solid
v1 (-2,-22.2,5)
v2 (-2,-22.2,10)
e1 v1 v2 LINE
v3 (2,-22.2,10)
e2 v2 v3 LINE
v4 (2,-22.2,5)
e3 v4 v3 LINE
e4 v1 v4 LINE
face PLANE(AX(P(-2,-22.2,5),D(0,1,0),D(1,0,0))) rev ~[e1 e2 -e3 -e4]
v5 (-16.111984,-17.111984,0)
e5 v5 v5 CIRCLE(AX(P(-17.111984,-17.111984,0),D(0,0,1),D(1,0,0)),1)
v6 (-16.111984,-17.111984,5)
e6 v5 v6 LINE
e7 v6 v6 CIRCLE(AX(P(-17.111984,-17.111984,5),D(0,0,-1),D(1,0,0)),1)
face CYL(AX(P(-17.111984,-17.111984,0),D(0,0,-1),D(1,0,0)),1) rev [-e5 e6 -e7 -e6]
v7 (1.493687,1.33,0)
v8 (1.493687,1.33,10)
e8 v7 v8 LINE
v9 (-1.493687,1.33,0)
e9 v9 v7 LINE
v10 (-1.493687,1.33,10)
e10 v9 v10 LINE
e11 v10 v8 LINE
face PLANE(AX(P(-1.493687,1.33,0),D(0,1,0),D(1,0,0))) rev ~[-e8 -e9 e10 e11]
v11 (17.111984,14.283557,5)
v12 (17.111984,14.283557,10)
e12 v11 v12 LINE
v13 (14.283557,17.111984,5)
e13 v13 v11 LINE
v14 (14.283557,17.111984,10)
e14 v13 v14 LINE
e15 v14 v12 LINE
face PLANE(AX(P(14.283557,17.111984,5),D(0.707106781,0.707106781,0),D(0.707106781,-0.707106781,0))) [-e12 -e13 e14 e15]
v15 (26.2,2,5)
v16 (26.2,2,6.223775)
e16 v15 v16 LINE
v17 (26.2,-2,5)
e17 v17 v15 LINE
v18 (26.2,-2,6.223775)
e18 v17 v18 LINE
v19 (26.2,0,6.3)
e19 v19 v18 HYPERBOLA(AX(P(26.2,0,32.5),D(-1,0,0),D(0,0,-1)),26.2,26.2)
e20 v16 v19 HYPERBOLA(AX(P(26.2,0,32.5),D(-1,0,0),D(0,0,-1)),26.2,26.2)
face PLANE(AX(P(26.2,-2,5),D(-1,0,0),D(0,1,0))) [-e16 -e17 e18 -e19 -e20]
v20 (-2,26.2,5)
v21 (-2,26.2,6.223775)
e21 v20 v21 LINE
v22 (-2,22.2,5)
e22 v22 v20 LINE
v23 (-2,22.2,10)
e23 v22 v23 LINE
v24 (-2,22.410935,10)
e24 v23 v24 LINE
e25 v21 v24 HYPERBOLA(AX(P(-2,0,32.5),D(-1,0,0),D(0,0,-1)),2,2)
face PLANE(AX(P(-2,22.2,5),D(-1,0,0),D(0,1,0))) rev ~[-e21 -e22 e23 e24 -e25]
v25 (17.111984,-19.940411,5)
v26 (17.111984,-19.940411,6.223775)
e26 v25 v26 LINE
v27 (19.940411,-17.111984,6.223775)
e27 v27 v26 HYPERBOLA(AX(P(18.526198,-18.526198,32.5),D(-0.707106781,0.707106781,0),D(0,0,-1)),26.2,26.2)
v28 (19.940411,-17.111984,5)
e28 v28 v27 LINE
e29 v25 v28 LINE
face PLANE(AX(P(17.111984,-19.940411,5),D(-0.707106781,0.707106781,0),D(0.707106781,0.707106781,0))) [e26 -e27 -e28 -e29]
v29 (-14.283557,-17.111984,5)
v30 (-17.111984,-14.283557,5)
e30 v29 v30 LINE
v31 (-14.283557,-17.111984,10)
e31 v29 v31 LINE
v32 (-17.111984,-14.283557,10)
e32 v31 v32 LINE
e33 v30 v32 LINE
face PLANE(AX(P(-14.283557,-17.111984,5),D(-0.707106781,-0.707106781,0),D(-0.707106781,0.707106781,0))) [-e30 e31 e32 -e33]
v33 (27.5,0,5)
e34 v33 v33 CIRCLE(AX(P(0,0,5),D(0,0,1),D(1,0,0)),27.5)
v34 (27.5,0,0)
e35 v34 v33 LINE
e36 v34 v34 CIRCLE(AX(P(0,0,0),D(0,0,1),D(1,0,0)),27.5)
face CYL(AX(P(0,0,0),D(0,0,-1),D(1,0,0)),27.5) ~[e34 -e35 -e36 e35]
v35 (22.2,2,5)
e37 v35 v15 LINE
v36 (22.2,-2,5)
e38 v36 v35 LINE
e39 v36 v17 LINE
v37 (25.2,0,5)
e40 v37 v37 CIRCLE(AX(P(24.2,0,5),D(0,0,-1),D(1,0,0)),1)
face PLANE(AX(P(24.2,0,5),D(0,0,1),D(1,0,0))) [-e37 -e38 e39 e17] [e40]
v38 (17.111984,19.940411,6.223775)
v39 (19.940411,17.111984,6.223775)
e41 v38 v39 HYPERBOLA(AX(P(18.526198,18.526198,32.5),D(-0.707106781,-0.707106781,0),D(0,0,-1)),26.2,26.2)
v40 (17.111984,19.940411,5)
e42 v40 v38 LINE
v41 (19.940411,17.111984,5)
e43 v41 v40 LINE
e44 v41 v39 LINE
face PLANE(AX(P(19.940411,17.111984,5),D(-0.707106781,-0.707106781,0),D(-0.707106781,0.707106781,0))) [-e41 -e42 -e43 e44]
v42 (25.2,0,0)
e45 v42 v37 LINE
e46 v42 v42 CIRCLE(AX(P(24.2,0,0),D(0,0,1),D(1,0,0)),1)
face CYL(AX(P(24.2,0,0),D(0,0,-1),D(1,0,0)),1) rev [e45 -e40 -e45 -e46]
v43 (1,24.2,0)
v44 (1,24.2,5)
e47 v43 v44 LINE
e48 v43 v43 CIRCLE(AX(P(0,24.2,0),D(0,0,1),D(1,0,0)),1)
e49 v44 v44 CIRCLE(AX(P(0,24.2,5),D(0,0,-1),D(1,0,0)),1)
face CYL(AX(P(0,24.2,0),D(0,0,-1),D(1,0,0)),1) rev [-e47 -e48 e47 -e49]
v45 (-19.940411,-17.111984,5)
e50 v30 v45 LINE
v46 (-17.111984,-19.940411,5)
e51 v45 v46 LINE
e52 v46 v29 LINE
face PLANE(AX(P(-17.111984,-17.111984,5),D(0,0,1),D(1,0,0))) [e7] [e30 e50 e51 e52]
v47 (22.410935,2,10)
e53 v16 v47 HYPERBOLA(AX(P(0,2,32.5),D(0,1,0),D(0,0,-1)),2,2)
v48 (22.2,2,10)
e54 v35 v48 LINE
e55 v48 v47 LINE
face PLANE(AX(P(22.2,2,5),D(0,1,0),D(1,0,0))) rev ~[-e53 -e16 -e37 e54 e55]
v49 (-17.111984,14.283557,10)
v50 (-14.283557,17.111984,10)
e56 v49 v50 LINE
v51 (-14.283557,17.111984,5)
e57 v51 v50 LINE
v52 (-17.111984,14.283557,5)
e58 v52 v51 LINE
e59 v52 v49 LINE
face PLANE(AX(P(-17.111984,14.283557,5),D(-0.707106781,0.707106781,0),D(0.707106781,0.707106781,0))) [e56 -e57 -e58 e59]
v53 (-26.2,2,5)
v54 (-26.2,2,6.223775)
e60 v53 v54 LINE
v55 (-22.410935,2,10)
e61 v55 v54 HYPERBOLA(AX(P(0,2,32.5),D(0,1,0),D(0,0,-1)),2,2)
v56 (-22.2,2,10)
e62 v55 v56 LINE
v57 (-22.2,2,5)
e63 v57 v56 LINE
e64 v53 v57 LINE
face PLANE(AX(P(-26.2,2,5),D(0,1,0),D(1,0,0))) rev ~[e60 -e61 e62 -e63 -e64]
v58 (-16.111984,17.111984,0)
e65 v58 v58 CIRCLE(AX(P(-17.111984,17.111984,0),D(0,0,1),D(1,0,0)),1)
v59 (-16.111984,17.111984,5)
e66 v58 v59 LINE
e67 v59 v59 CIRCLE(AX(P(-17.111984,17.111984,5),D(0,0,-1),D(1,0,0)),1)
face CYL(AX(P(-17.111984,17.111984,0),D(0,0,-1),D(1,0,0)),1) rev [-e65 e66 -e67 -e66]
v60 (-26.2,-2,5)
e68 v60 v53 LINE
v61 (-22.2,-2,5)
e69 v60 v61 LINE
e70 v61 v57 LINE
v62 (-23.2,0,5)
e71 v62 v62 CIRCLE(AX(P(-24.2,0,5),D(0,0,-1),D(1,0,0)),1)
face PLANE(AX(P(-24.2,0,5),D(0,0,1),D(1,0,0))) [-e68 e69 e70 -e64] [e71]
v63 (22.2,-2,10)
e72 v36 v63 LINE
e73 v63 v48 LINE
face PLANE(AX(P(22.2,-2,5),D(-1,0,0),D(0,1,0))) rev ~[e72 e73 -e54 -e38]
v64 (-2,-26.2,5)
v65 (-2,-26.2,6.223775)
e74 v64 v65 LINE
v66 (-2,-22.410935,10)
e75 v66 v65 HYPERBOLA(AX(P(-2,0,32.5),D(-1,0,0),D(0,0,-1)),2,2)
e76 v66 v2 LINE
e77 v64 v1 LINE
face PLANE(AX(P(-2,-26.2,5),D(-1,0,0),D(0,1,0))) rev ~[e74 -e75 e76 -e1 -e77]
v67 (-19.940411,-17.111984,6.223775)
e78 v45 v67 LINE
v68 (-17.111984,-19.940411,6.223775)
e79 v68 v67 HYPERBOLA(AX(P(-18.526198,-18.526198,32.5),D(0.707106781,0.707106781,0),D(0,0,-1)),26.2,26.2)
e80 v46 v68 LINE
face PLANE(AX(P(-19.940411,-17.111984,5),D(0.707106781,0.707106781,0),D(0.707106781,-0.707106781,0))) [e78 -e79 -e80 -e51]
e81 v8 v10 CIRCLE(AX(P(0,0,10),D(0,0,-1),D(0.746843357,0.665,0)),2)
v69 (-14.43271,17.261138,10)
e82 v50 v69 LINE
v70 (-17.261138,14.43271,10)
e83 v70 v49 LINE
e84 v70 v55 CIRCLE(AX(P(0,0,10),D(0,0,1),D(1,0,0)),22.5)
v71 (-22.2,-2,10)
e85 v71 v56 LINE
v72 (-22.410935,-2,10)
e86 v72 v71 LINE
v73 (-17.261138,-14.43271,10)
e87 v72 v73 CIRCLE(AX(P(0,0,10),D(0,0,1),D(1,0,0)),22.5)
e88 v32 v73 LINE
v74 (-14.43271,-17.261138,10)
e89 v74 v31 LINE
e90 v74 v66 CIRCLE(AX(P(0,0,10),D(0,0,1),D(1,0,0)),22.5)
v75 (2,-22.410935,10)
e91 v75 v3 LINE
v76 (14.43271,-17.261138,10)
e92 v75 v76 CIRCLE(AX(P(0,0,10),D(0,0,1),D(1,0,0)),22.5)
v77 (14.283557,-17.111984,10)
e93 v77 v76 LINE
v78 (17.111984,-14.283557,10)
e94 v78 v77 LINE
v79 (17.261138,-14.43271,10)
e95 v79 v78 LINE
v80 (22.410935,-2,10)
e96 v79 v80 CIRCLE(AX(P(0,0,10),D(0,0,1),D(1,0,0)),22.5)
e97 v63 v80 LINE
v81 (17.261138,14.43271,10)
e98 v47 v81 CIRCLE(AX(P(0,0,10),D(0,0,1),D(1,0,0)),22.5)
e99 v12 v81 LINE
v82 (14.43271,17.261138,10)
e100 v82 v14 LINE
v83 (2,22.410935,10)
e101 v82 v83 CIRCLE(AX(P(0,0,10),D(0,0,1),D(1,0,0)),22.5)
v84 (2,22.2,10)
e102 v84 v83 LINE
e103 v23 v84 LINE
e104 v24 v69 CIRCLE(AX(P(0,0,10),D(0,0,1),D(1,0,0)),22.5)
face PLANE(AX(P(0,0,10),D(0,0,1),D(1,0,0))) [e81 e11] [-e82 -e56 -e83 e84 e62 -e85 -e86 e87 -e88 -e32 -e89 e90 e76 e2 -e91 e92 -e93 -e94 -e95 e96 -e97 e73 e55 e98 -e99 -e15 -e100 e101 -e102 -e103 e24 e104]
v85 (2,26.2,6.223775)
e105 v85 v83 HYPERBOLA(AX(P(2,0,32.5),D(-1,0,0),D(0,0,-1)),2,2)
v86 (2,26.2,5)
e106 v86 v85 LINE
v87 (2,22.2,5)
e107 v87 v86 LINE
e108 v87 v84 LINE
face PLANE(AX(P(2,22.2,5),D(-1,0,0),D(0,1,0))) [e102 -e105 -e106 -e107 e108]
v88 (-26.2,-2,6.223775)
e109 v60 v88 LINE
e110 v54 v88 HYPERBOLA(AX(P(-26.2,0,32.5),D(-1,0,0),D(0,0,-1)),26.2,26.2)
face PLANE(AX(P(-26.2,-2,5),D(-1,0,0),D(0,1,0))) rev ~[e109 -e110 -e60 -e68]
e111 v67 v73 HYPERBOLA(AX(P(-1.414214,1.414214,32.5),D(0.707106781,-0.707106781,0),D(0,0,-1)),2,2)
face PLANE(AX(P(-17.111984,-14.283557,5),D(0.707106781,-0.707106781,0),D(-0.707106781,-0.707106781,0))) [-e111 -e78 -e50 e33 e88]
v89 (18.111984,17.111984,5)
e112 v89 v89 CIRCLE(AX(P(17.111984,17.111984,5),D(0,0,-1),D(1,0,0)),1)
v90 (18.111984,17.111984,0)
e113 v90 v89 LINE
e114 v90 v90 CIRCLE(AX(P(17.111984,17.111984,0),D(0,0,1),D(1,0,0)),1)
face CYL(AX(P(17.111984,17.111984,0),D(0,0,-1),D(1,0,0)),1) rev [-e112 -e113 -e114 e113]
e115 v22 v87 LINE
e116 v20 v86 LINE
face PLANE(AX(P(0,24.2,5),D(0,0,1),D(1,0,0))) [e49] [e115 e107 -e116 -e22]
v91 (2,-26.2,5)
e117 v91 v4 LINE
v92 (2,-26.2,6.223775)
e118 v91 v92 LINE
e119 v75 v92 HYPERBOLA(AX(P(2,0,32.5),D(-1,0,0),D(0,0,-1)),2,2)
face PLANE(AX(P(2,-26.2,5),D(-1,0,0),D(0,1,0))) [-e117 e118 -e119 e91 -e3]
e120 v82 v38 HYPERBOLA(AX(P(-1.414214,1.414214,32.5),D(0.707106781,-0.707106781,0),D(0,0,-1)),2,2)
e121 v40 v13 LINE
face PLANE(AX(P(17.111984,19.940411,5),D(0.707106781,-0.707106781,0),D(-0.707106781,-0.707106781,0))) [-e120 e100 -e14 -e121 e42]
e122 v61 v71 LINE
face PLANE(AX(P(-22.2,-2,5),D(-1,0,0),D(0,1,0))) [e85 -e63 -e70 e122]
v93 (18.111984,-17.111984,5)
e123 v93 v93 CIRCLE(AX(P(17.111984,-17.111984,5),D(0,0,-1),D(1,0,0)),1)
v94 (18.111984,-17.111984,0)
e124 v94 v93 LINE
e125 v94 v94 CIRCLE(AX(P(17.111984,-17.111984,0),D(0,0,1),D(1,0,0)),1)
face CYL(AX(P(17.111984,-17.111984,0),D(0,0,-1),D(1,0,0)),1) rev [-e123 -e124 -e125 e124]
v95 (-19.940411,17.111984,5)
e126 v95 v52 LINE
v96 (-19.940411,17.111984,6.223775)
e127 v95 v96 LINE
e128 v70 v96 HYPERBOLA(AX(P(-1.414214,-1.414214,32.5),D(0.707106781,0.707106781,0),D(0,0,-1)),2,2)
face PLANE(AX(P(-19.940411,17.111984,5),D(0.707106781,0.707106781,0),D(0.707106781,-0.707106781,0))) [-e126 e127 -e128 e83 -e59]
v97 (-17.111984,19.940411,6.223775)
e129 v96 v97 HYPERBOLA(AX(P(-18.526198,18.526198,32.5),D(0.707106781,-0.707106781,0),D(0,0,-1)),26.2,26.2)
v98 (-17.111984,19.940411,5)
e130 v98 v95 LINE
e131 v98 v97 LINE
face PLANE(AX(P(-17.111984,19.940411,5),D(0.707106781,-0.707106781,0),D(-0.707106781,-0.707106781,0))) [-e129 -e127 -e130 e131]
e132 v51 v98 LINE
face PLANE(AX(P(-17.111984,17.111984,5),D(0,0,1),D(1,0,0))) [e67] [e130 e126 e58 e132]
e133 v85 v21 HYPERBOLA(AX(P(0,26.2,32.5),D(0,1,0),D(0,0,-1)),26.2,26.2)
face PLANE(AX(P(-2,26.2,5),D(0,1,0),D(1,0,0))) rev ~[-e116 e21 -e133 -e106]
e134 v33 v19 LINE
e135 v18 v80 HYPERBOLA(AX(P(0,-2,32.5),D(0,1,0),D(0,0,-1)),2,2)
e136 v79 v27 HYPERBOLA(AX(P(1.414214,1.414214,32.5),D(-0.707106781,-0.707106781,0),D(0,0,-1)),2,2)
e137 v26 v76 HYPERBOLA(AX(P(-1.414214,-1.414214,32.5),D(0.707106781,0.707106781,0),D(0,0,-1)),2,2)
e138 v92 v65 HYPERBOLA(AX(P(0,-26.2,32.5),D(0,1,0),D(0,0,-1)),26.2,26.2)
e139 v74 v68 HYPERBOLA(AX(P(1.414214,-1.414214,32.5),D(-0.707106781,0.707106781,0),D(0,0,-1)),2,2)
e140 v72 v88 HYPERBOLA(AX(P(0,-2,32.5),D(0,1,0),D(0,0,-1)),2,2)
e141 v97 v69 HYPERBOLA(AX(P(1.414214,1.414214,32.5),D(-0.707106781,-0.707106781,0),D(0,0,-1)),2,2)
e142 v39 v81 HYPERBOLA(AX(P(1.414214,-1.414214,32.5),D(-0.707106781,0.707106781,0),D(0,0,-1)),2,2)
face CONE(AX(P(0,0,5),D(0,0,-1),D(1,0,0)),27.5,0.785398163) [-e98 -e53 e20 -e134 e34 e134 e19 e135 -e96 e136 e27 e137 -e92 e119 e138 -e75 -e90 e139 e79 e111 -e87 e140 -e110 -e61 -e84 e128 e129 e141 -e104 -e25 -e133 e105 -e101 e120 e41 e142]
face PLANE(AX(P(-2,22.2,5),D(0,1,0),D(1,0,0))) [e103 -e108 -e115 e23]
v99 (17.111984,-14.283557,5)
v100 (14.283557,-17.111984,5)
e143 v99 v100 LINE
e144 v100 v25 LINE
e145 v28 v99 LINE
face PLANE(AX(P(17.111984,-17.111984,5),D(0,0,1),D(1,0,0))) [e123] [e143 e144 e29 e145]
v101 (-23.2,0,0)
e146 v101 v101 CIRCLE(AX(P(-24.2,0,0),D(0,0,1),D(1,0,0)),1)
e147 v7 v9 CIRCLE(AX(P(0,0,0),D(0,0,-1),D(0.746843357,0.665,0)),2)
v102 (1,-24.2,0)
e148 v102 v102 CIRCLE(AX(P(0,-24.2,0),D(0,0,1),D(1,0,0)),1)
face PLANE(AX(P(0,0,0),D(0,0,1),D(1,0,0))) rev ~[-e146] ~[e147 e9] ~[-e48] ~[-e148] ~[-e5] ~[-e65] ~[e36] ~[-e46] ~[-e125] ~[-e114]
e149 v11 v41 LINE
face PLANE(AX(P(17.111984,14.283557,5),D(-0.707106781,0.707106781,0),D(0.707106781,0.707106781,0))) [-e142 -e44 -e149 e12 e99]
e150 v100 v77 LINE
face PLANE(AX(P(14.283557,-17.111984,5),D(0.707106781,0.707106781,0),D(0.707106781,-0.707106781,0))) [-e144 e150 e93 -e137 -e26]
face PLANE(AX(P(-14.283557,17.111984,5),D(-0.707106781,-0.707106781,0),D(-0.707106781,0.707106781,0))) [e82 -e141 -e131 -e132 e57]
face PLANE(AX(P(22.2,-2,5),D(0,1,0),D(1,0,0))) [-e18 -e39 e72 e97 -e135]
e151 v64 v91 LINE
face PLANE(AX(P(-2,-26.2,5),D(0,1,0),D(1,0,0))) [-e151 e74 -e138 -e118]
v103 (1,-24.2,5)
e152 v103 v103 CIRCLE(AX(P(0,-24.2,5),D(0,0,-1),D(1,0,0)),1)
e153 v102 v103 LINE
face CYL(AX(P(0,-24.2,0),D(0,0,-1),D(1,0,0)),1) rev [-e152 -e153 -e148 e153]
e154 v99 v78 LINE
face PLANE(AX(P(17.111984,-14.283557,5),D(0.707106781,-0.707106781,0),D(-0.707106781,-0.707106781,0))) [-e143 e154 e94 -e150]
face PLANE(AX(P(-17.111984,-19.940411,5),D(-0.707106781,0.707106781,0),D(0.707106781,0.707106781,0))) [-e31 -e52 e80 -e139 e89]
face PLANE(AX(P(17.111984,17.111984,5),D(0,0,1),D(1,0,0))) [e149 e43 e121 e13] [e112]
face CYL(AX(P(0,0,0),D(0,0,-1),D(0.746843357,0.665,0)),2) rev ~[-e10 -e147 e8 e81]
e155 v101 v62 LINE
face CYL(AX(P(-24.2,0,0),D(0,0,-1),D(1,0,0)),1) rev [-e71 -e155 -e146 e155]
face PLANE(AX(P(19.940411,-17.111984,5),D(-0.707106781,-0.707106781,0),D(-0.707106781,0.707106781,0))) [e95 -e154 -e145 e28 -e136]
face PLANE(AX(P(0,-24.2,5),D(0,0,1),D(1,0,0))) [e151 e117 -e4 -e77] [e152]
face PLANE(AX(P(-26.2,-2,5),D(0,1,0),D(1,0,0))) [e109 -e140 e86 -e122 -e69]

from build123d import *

# Parameters (mm, degrees)
F0_R     = 27.5
F0_R_2   = 1
F0_R_3   = 21.1
F1_DEPTH = 10
F3_DEPTH = 10
F5_W     = 4
F5_H     = 4
F5_R     = 1
F6_DEPTH = 5


# Not quite as in the source:
# - a fillet or chamfer that OpenCascade refuses, or shapes differently, is made with other operations: its cross-section is extruded or revolved along the edge and cut away or added


with BuildPart() as f1:
    # F0 (on Top) → F1 (new body)
    with BuildSketch(Plane.XY):
        Circle(F0_R)
        with Locations((-17.1119841047, -17.1119841047)):
            Circle(F0_R_2, mode=Mode.SUBTRACT)
        with Locations((0, -24.2)):
            Circle(F0_R_2, mode=Mode.SUBTRACT)
        with Locations((17.1119841047, -17.1119841047)):
            Circle(F0_R_2, mode=Mode.SUBTRACT)
        with Locations((-24.2, 0)):
            Circle(F0_R_2, mode=Mode.SUBTRACT)
        with Locations((-17.1119841047, 17.1119841047)):
            Circle(F0_R_2, mode=Mode.SUBTRACT)
        Circle(F0_R_3, mode=Mode.SUBTRACT)
        with Locations((24.2, 0)):
            Circle(F0_R_2, mode=Mode.SUBTRACT)
        with Locations((0, 24.2)):
            Circle(F0_R_2, mode=Mode.SUBTRACT)
        with Locations((17.1119841047, 17.1119841047)):
            Circle(F0_R_2, mode=Mode.SUBTRACT)
        Circle(F0_R_3)
        with BuildLine():
            ThreePointArc((1.4936867141, 1.33), (0, -2), (-1.4936867141, 1.33))
            Line((-1.4936867141, 1.33), (1.4936867141, 1.33))
        make_face(mode=Mode.SUBTRACT)
    extrude(amount=F1_DEPTH)

    # F2: chamfer of 5 on 1 edges, made by hand

    # F2_s1 → F2_t2 (revolve, cut)
    with BuildSketch(Plane.XZ):
        Polygon((27.5, 5), (22.5, 10), (27.5, 10), align=None)
    revolve(axis=Axis((0, 0, 10), (0, 0, 1)), mode=Mode.SUBTRACT)

    # F0 (on Top) → F3 (cut)
    with BuildSketch(Plane.XY):
        with BuildLine():
            Line((1.4936867141, 1.33), (-1.4936867141, 1.33))
            ThreePointArc((-1.4936867141, 1.33), (0, -2), (1.4936867141, 1.33))
        make_face()
    extrude(amount=F3_DEPTH, mode=Mode.SUBTRACT)

    # F5 (on offset) → F6 (cut)
    with BuildSketch(Plane.XY.offset(5)):
        with Locations((0, 24.2)):
            Rectangle(F5_W, F5_H)
        with Locations((0, 24.2)):
            Circle(F5_R, mode=Mode.SUBTRACT)
        with Locations((0, 24.2)):
            Circle(F5_R)
        Polygon((-14.28355698, 17.1119841047), (-17.1119841047, 19.9404112295), (-19.9404112295, 17.1119841047), (-17.1119841047, 14.28355698), align=None)
        Polygon((17.1119841047, 14.28355698), (19.9404112295, 17.1119841047), (17.1119841047, 19.9404112295), (14.28355698, 17.1119841047), align=None)
        with Locations((-24.2, 0)):
            Rectangle(F5_W, F5_H)
        Polygon((-17.1119841047, -14.28355698), (-19.9404112295, -17.1119841047), (-17.1119841047, -19.9404112295), (-14.28355698, -17.1119841047), align=None)
        with Locations((0, -24.2)):
            Rectangle(F5_W, F5_H)
        Polygon((14.28355698, -17.1119841047), (17.1119841047, -19.9404112295), (19.9404112295, -17.1119841047), (17.1119841047, -14.28355698), align=None)
        with Locations((24.2, 0)):
            Rectangle(F5_W, F5_H)
    extrude(amount=F6_DEPTH, mode=Mode.SUBTRACT)


solid = f1.part
